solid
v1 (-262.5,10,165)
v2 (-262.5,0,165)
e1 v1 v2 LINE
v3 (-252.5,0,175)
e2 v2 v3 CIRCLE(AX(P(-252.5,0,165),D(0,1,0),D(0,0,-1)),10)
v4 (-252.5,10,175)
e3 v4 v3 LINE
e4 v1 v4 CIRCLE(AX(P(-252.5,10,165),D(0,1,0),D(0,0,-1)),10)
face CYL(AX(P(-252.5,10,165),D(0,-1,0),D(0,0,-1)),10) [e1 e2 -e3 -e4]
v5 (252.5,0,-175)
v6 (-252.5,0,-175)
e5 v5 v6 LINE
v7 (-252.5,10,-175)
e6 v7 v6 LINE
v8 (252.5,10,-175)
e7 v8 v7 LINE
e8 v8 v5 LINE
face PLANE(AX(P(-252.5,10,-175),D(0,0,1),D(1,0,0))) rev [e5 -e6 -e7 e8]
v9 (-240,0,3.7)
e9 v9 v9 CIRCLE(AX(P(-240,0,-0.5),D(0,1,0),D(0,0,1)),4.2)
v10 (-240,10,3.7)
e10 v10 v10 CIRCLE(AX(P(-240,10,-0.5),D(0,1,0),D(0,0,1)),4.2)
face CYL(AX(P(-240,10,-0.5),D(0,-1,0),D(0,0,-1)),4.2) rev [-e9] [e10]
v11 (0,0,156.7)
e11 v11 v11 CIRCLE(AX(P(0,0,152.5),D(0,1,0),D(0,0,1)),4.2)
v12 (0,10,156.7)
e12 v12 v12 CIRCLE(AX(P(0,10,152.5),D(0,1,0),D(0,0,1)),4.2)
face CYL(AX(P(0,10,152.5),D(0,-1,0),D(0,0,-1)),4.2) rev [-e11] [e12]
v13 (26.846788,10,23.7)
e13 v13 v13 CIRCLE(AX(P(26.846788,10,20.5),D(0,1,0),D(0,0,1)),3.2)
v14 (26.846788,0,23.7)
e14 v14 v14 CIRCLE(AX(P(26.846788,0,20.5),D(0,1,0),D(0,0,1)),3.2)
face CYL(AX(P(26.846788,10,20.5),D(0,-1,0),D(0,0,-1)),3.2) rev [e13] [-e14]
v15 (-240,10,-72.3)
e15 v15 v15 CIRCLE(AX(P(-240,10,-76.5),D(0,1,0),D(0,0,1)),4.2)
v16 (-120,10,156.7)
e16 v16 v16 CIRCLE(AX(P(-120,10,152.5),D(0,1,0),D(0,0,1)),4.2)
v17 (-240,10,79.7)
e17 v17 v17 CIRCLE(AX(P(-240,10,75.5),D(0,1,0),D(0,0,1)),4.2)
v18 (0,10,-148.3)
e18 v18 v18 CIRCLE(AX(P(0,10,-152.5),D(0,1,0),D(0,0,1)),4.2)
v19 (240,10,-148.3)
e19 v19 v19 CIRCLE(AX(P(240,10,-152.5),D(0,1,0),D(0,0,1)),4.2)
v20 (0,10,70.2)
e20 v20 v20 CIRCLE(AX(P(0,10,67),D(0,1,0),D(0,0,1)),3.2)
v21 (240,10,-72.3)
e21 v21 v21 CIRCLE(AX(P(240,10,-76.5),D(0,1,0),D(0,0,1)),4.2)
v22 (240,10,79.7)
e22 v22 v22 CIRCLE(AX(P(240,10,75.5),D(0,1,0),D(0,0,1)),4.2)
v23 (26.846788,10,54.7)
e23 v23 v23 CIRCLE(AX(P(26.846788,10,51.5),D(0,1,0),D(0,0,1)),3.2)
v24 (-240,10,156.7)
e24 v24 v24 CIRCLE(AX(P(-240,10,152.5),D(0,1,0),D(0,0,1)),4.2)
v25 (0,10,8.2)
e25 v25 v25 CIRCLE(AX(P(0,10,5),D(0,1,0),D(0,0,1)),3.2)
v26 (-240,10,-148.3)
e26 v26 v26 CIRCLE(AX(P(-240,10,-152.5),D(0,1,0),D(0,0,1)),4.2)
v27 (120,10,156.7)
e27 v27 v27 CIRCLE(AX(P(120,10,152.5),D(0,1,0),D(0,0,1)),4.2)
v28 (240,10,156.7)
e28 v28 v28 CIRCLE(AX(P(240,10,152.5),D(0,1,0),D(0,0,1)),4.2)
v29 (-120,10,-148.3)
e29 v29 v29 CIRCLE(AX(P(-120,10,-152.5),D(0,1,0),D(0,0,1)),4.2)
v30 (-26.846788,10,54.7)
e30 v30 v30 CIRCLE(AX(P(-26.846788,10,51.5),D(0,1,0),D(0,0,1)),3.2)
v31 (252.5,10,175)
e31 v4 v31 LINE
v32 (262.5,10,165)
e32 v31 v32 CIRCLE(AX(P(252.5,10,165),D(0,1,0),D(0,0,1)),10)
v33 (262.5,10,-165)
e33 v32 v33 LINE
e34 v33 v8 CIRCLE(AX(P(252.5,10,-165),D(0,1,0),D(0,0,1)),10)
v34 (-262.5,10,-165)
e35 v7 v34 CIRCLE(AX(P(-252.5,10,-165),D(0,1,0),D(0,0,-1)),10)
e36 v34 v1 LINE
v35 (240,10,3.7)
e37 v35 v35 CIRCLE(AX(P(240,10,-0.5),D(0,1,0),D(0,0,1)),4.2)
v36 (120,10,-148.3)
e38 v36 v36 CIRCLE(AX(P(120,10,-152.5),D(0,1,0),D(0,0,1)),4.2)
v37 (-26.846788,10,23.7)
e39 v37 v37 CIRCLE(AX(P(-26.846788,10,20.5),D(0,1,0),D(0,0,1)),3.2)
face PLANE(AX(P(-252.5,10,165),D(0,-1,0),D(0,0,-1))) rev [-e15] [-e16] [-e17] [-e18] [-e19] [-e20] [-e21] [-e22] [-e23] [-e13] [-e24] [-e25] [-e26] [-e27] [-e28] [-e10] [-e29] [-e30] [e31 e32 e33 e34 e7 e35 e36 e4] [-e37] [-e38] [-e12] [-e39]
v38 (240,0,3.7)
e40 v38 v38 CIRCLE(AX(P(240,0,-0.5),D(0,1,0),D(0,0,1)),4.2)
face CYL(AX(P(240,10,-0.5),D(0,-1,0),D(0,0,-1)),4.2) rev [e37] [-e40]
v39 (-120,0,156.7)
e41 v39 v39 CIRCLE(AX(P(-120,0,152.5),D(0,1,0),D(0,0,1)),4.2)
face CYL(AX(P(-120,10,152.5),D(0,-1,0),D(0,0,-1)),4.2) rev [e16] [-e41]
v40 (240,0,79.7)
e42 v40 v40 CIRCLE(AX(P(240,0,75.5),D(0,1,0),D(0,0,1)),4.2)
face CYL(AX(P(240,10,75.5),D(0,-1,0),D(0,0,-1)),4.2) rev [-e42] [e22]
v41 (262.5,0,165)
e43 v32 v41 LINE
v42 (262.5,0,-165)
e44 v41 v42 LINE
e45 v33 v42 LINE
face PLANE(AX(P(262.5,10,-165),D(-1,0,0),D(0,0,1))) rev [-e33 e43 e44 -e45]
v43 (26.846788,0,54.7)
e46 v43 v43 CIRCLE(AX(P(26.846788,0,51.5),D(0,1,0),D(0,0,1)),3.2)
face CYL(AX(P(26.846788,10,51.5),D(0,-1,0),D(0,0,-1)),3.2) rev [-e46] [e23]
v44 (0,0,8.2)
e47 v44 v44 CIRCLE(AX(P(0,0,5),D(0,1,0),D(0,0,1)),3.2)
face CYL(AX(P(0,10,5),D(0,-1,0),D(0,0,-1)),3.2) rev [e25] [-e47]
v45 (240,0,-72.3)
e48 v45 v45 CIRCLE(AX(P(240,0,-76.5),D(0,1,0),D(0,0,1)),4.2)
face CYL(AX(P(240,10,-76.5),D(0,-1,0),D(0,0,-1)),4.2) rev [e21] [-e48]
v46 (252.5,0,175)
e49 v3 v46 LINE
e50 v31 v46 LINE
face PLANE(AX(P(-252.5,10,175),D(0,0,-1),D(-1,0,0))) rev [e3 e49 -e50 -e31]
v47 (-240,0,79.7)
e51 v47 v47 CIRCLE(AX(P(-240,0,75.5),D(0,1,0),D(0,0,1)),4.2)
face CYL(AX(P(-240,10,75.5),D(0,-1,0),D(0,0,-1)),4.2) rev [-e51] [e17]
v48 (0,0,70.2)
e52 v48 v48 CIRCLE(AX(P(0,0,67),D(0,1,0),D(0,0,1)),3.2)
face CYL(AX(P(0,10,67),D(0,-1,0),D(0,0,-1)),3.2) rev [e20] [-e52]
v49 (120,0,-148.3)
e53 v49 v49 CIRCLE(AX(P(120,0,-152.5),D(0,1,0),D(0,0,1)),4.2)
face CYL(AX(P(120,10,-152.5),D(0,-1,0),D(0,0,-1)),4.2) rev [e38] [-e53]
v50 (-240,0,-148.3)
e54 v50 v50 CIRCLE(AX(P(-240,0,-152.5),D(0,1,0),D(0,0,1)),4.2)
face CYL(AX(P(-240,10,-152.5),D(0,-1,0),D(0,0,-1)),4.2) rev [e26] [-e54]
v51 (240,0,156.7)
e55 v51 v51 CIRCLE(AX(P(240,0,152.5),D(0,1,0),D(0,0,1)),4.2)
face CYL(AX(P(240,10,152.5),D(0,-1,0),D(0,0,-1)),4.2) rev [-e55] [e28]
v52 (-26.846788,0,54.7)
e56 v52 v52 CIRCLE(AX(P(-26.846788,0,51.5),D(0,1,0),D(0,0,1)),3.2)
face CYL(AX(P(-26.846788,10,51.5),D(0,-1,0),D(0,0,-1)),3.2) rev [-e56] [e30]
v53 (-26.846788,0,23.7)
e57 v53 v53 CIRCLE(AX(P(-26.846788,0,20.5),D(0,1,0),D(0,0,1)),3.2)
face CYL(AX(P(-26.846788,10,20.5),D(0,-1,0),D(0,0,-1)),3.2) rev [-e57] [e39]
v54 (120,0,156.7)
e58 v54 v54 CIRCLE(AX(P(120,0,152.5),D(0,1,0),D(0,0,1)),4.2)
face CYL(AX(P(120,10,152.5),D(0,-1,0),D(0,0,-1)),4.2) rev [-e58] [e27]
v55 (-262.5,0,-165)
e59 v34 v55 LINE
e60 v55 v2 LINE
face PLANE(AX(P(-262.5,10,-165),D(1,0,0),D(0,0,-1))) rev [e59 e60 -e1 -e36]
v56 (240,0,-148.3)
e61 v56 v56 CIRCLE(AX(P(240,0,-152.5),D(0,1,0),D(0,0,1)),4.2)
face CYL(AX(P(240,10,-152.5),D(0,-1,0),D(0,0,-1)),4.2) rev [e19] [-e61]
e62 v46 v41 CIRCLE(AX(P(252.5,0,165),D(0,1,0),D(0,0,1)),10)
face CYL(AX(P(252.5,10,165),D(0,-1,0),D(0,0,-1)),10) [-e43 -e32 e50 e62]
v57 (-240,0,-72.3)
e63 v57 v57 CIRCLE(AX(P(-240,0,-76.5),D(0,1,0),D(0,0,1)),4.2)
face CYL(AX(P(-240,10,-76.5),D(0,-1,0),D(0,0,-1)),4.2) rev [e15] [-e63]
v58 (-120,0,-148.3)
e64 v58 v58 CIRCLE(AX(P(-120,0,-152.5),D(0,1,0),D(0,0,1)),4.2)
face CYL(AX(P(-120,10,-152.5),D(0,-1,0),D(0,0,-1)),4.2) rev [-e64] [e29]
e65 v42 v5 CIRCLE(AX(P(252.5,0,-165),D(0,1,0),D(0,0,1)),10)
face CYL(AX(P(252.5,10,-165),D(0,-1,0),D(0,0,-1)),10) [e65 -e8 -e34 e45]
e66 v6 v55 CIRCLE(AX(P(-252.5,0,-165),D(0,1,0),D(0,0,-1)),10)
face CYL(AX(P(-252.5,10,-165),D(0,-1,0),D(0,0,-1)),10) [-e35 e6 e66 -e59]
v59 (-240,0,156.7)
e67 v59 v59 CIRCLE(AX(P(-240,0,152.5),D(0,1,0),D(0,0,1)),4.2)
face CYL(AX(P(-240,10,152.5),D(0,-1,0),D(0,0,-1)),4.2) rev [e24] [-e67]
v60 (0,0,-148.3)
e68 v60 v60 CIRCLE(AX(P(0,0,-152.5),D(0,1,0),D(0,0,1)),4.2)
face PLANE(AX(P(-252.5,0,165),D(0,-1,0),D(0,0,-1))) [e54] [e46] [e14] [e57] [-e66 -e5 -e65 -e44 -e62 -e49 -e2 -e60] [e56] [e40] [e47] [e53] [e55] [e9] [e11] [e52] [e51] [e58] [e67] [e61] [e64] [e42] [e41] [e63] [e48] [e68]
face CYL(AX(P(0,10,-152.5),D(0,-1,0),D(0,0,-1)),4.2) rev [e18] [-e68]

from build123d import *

# Parameters (mm, degrees)
SKETCH1_R          = 4.2
SKETCH1_R_2        = 3.2
BASE_FLANGE1_DEPTH = 10


# Sheet-metal steps are written as plain solids
with BuildPart() as part:
    # Sketch1 → Base-Flange1 (new body)
    with BuildSketch(Plane(origin=(0, 0, 0), x_dir=(1, 0, 0), z_dir=(0, 1, 0))):
        with BuildLine():
            Line((-252.5, 175), (252.5, 175))
            ThreePointArc((252.5, 175), (259.571067812, 172.071067812), (262.5, 165))
            Line((262.5, 165), (262.5, -165))
            ThreePointArc((262.5, -165), (259.571067812, -172.071067812), (252.5, -175))
            Line((252.5, -175), (-252.5, -175))
            ThreePointArc((-252.5, -175), (-259.571067812, -172.071067812), (-262.5, -165))
            Line((-262.5, -165), (-262.5, 165))
            ThreePointArc((-262.5, 165), (-259.571067812, 172.071067812), (-252.5, 175))
        make_face()
        with Locations(Location((-240, 152.5, 0), (0, 0, 270))):
            Circle(SKETCH1_R, mode=Mode.SUBTRACT)
        with Locations(Location((-240, 76.5, 0), (0, 0, 270))):
            Circle(SKETCH1_R, mode=Mode.SUBTRACT)
        with Locations(Location((-240, 0.5, 0), (0, 0, 270))):
            Circle(SKETCH1_R, mode=Mode.SUBTRACT)
        with Locations(Location((-240, -75.5, 0), (0, 0, 270))):
            Circle(SKETCH1_R, mode=Mode.SUBTRACT)
        with Locations(Location((240, 152.5, 0), (0, 0, 270))):
            Circle(SKETCH1_R, mode=Mode.SUBTRACT)
        with Locations(Location((240, 76.5, 0), (0, 0, 270))):
            Circle(SKETCH1_R, mode=Mode.SUBTRACT)
        with Locations(Location((240, 0.5, 0), (0, 0, 270))):
            Circle(SKETCH1_R, mode=Mode.SUBTRACT)
        with Locations(Location((240, -75.5, 0), (0, 0, 270))):
            Circle(SKETCH1_R, mode=Mode.SUBTRACT)
        with Locations(Location((0, -5, 0), (0, 0, 270))):
            Circle(SKETCH1_R_2, mode=Mode.SUBTRACT)
        with Locations(Location((-120, 152.5, 0), (0, 0, 270))):
            Circle(SKETCH1_R, mode=Mode.SUBTRACT)
        with Locations(Location((0, 152.5, 0), (0, 0, 270))):
            Circle(SKETCH1_R, mode=Mode.SUBTRACT)
        with Locations(Location((120, 152.5, 0), (0, 0, 270))):
            Circle(SKETCH1_R, mode=Mode.SUBTRACT)
        with Locations(Location((26.846787517, -20.5, 0), (0, 0, 270))):
            Circle(SKETCH1_R_2, mode=Mode.SUBTRACT)
        with Locations(Location((26.846787517, -51.5, 0), (0, 0, 270))):
            Circle(SKETCH1_R_2, mode=Mode.SUBTRACT)
        with Locations(Location((0, -67, 0), (0, 0, 270))):
            Circle(SKETCH1_R_2, mode=Mode.SUBTRACT)
        with Locations(Location((-26.846787517, -51.5, 0), (0, 0, 270))):
            Circle(SKETCH1_R_2, mode=Mode.SUBTRACT)
        with Locations(Location((-26.846787517, -20.5, 0), (0, 0, 270))):
            Circle(SKETCH1_R_2, mode=Mode.SUBTRACT)
        with Locations(Location((-240, -152.5, 0), (0, 0, 270))):
            Circle(SKETCH1_R, mode=Mode.SUBTRACT)
        with Locations(Location((-120, -152.5, 0), (0, 0, 270))):
            Circle(SKETCH1_R, mode=Mode.SUBTRACT)
        with Locations(Location((0, -152.5, 0), (0, 0, 270))):
            Circle(SKETCH1_R, mode=Mode.SUBTRACT)
        with Locations(Location((120, -152.5, 0), (0, 0, 270))):
            Circle(SKETCH1_R, mode=Mode.SUBTRACT)
        with Locations(Location((240, -152.5, 0), (0, 0, 270))):
            Circle(SKETCH1_R, mode=Mode.SUBTRACT)
    extrude(amount=BASE_FLANGE1_DEPTH)


solid = part.part
